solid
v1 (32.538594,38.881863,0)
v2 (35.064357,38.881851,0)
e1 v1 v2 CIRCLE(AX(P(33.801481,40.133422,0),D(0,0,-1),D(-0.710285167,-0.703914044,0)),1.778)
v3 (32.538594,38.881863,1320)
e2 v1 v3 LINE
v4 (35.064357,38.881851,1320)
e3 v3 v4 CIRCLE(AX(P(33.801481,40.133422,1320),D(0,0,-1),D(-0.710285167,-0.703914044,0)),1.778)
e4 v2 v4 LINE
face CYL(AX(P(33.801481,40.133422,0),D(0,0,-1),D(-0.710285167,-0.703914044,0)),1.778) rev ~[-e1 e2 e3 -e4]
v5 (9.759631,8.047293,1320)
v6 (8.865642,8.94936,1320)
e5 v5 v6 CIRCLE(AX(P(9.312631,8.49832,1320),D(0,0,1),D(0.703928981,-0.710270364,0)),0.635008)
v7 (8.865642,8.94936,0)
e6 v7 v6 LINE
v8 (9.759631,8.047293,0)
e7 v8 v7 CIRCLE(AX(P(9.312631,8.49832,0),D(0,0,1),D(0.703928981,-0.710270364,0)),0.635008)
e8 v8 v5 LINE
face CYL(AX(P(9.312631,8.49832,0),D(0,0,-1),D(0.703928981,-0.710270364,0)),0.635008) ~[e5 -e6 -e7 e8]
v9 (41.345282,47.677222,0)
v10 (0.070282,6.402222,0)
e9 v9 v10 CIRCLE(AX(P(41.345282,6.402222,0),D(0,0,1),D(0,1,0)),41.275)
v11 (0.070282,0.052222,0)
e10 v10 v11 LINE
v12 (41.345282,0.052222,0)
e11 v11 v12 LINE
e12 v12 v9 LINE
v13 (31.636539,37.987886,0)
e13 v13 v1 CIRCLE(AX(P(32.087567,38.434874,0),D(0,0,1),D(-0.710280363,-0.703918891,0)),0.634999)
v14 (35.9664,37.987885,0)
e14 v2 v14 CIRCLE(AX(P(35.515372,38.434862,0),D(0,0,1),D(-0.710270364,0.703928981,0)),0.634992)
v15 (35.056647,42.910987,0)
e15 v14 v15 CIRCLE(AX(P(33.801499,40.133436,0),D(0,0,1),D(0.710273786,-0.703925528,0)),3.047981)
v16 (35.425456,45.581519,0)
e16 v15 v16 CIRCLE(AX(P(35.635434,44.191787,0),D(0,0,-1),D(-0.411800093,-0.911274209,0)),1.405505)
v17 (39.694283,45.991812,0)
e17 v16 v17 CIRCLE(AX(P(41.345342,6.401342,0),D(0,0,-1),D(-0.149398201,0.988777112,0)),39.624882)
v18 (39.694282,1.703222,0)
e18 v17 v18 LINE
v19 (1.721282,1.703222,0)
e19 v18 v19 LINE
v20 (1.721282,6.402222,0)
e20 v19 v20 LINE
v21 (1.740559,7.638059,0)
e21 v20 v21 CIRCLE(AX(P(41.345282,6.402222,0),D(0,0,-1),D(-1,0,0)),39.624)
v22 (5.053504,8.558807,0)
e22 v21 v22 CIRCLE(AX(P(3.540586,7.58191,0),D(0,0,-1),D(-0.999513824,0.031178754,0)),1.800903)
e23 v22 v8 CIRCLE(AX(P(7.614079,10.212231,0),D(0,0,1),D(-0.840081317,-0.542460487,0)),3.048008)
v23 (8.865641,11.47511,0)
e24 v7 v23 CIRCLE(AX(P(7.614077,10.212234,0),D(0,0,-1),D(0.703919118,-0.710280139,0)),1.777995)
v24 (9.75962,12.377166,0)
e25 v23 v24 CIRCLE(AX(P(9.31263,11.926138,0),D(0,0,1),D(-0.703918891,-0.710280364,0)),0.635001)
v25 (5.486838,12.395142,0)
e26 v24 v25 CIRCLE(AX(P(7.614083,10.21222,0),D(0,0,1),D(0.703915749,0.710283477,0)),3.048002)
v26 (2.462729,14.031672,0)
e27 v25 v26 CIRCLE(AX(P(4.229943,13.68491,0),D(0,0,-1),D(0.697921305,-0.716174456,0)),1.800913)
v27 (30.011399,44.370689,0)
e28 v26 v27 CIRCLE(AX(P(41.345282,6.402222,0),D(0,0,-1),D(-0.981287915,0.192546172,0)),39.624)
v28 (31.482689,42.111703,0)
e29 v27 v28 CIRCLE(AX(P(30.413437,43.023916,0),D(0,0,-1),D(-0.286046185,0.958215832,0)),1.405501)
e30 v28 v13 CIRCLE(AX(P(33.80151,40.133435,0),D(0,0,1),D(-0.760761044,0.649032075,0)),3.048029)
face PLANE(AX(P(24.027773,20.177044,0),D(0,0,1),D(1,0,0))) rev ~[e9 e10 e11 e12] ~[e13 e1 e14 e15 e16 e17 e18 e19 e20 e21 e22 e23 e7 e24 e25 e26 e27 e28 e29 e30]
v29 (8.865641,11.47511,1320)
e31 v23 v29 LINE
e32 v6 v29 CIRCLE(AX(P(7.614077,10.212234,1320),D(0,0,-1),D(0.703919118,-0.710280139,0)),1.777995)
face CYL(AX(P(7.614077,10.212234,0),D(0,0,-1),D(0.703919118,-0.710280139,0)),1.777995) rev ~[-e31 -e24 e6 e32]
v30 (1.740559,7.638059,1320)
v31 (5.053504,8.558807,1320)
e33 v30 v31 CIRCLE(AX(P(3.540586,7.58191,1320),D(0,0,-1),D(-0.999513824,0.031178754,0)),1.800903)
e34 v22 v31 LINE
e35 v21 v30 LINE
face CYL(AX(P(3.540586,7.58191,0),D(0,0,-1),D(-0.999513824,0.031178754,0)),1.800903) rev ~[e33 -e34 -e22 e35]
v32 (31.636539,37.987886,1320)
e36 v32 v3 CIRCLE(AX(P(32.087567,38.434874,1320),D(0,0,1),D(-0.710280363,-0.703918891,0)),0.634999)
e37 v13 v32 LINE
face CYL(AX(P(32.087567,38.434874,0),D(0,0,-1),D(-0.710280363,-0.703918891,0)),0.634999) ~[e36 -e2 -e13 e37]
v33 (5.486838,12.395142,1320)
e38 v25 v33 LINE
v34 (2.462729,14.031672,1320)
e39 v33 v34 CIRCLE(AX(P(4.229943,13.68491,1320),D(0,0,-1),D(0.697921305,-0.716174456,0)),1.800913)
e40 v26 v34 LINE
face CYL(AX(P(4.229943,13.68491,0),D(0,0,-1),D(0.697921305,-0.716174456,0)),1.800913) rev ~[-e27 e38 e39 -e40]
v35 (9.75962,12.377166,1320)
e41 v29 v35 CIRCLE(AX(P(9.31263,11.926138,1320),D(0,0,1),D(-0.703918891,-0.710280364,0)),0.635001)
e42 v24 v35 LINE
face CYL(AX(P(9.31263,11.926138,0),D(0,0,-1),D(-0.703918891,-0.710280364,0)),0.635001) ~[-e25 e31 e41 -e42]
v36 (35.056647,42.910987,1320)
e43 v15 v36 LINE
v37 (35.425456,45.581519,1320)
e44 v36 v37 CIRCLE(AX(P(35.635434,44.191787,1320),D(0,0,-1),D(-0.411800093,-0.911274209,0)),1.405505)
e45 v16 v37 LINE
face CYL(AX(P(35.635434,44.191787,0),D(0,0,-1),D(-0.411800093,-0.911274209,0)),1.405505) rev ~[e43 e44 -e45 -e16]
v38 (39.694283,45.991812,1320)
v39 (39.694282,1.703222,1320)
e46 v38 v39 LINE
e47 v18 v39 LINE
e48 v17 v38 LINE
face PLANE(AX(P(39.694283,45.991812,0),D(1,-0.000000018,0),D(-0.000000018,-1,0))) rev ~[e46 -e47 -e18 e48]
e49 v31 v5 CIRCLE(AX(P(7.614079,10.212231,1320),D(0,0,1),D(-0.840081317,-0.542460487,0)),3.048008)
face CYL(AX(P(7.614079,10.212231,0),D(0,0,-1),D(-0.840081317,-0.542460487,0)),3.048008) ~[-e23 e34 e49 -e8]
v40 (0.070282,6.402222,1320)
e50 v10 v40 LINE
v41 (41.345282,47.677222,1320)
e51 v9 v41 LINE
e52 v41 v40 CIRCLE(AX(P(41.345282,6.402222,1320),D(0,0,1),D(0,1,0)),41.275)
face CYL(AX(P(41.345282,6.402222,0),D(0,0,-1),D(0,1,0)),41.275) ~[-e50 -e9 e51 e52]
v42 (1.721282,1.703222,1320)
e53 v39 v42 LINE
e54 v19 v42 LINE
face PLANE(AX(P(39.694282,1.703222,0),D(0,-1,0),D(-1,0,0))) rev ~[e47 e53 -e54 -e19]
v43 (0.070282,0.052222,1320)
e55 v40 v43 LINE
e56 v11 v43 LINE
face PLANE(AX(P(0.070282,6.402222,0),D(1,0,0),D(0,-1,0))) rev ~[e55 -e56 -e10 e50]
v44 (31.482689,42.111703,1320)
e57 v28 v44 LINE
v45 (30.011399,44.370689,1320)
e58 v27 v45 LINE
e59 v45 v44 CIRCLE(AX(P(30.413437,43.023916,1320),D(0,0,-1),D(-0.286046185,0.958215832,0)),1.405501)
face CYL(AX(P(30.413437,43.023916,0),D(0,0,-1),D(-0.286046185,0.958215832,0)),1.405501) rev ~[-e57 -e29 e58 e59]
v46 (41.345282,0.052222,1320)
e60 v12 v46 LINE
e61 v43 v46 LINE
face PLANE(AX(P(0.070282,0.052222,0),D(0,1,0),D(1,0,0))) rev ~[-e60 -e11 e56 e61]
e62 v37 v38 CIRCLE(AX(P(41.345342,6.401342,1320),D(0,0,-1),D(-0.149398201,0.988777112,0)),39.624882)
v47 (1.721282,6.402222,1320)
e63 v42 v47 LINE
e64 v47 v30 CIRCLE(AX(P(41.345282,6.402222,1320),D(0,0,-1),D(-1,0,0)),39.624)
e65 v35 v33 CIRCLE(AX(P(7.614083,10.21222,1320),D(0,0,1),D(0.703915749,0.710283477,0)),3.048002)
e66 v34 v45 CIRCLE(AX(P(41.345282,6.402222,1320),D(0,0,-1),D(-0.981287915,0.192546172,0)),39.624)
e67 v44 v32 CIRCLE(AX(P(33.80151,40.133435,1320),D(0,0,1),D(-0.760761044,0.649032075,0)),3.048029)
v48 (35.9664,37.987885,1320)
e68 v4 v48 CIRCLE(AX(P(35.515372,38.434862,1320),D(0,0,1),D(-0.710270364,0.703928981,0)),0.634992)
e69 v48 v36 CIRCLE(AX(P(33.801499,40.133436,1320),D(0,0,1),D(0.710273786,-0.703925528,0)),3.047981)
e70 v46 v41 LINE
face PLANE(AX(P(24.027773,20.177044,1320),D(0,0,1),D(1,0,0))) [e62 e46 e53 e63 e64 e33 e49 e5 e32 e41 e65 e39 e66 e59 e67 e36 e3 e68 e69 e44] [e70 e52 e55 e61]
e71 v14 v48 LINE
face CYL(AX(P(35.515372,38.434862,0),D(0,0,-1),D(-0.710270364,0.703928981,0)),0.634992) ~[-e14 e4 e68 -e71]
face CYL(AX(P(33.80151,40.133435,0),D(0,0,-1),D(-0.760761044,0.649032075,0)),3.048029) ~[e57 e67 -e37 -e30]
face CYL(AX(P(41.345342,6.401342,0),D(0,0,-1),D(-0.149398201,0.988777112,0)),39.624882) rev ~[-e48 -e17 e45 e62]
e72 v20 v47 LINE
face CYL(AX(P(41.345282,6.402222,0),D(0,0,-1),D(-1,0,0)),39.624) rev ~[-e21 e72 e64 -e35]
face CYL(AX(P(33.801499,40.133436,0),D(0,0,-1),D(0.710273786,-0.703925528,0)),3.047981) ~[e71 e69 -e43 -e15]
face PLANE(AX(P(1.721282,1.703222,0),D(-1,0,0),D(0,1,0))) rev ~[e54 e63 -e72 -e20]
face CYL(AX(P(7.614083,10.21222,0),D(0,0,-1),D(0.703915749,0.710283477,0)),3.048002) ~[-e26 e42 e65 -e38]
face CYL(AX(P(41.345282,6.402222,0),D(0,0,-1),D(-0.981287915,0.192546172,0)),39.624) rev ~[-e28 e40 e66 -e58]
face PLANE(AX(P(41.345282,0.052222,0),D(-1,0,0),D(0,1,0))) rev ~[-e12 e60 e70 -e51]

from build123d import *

# Parameters (mm, degrees)
F1_DEPTH = 1320


# Not quite as in the source:
# - ends of sketch curves that miss each other by under 0.0002 mm in the source are joined


with BuildPart() as f1:
    # F0 (on Top) → F1 (new body)
    with BuildSketch(Plane.XY):
        with BuildLine():
            Line((0.0702818, 6.4022224), (0.0702818, 0.0522224))
            Line((0.0702818, 0.0522224), (41.3452818, 0.0522224))
            Line((41.3452818, 0.0522224), (41.3452818, 47.6772224))
            ThreePointArc((41.3452818, 47.6772224), (12.1594494065, 35.5880547935), (0.0702818, 6.4022224))
        make_face()
        with BuildLine():
            ThreePointArc((2.4627294682, 14.0316719322), (12.0103779586, 33.0391289887), (30.0113989636, 44.370689262))
            ThreePointArc((30.0113989636, 44.370689262), (31.5911647015, 43.7909818691), (31.4826885527, 42.111702976))
            ThreePointArc((31.4826885527, 42.111702976), (30.7556005021, 40.0197952956), (31.6365393769, 37.9878855663))
            ThreePointArc((31.6365393769, 37.9878855663), (32.5345549665, 37.9838460356), (32.5385935644, 38.8818625665))
            ThreePointArc((32.5385935644, 38.8818625665), (33.8014907398, 41.9114224), (35.0643565086, 38.8818507998))
            ThreePointArc((35.0643565086, 38.8818507998), (35.0683832335, 37.9838460356), (35.9663997644, 37.9878846335))
            ThreePointArc((35.9663997644, 37.9878846335), (36.7987348031, 40.6872982302), (35.056647343, 42.9109867034))
            ThreePointArc((35.056647343, 42.9109867034), (34.2431436666, 44.3840647436), (35.4254562981, 45.581518551))
            ThreePointArc((35.4254562981, 45.581518551), (37.5543147935, 45.8444579497), (39.6942825983, 45.9918116582))
            Line((39.6942825983, 45.9918116582), (39.6942818, 1.7032224))
            Line((39.6942818, 1.7032224), (1.7212818, 1.7032224))
            Line((1.7212818, 1.7032224), (1.7212818, 6.4022224))
            ThreePointArc((1.7212818, 6.4022224), (1.7261013466, 7.0202160926), (1.7405588141, 7.6380594495))
            ThreePointArc((1.7405588141, 7.6380594495), (3.0583454152, 9.3170447758), (5.0535040361, 8.5588069696))
            ThreePointArc((5.0535040361, 8.5588069696), (7.2847284354, 7.1820688789), (9.7596313332, 8.0472925626))
            ThreePointArc((9.7596313332, 8.0472925626), (9.7636581644, 8.9453209665), (8.8656416335, 8.9493595644))
            ThreePointArc((8.8656416335, 8.9493595644), (5.8360818, 10.2122134602), (8.8656407007, 11.4751096943))
            ThreePointArc((8.8656407007, 11.4751096943), (9.7636581644, 11.4791492335), (9.7596195665, 12.3771657644))
            ThreePointArc((9.7596195665, 12.3771657644), (7.6269060344, 13.2601954214), (5.4868384376, 12.3951423887))
            ThreePointArc((5.4868384376, 12.3951423887), (3.3728152631, 12.1010480384), (2.4627294682, 14.0316719322))
        make_face(mode=Mode.SUBTRACT)
    extrude(amount=F1_DEPTH)


solid = f1.part
